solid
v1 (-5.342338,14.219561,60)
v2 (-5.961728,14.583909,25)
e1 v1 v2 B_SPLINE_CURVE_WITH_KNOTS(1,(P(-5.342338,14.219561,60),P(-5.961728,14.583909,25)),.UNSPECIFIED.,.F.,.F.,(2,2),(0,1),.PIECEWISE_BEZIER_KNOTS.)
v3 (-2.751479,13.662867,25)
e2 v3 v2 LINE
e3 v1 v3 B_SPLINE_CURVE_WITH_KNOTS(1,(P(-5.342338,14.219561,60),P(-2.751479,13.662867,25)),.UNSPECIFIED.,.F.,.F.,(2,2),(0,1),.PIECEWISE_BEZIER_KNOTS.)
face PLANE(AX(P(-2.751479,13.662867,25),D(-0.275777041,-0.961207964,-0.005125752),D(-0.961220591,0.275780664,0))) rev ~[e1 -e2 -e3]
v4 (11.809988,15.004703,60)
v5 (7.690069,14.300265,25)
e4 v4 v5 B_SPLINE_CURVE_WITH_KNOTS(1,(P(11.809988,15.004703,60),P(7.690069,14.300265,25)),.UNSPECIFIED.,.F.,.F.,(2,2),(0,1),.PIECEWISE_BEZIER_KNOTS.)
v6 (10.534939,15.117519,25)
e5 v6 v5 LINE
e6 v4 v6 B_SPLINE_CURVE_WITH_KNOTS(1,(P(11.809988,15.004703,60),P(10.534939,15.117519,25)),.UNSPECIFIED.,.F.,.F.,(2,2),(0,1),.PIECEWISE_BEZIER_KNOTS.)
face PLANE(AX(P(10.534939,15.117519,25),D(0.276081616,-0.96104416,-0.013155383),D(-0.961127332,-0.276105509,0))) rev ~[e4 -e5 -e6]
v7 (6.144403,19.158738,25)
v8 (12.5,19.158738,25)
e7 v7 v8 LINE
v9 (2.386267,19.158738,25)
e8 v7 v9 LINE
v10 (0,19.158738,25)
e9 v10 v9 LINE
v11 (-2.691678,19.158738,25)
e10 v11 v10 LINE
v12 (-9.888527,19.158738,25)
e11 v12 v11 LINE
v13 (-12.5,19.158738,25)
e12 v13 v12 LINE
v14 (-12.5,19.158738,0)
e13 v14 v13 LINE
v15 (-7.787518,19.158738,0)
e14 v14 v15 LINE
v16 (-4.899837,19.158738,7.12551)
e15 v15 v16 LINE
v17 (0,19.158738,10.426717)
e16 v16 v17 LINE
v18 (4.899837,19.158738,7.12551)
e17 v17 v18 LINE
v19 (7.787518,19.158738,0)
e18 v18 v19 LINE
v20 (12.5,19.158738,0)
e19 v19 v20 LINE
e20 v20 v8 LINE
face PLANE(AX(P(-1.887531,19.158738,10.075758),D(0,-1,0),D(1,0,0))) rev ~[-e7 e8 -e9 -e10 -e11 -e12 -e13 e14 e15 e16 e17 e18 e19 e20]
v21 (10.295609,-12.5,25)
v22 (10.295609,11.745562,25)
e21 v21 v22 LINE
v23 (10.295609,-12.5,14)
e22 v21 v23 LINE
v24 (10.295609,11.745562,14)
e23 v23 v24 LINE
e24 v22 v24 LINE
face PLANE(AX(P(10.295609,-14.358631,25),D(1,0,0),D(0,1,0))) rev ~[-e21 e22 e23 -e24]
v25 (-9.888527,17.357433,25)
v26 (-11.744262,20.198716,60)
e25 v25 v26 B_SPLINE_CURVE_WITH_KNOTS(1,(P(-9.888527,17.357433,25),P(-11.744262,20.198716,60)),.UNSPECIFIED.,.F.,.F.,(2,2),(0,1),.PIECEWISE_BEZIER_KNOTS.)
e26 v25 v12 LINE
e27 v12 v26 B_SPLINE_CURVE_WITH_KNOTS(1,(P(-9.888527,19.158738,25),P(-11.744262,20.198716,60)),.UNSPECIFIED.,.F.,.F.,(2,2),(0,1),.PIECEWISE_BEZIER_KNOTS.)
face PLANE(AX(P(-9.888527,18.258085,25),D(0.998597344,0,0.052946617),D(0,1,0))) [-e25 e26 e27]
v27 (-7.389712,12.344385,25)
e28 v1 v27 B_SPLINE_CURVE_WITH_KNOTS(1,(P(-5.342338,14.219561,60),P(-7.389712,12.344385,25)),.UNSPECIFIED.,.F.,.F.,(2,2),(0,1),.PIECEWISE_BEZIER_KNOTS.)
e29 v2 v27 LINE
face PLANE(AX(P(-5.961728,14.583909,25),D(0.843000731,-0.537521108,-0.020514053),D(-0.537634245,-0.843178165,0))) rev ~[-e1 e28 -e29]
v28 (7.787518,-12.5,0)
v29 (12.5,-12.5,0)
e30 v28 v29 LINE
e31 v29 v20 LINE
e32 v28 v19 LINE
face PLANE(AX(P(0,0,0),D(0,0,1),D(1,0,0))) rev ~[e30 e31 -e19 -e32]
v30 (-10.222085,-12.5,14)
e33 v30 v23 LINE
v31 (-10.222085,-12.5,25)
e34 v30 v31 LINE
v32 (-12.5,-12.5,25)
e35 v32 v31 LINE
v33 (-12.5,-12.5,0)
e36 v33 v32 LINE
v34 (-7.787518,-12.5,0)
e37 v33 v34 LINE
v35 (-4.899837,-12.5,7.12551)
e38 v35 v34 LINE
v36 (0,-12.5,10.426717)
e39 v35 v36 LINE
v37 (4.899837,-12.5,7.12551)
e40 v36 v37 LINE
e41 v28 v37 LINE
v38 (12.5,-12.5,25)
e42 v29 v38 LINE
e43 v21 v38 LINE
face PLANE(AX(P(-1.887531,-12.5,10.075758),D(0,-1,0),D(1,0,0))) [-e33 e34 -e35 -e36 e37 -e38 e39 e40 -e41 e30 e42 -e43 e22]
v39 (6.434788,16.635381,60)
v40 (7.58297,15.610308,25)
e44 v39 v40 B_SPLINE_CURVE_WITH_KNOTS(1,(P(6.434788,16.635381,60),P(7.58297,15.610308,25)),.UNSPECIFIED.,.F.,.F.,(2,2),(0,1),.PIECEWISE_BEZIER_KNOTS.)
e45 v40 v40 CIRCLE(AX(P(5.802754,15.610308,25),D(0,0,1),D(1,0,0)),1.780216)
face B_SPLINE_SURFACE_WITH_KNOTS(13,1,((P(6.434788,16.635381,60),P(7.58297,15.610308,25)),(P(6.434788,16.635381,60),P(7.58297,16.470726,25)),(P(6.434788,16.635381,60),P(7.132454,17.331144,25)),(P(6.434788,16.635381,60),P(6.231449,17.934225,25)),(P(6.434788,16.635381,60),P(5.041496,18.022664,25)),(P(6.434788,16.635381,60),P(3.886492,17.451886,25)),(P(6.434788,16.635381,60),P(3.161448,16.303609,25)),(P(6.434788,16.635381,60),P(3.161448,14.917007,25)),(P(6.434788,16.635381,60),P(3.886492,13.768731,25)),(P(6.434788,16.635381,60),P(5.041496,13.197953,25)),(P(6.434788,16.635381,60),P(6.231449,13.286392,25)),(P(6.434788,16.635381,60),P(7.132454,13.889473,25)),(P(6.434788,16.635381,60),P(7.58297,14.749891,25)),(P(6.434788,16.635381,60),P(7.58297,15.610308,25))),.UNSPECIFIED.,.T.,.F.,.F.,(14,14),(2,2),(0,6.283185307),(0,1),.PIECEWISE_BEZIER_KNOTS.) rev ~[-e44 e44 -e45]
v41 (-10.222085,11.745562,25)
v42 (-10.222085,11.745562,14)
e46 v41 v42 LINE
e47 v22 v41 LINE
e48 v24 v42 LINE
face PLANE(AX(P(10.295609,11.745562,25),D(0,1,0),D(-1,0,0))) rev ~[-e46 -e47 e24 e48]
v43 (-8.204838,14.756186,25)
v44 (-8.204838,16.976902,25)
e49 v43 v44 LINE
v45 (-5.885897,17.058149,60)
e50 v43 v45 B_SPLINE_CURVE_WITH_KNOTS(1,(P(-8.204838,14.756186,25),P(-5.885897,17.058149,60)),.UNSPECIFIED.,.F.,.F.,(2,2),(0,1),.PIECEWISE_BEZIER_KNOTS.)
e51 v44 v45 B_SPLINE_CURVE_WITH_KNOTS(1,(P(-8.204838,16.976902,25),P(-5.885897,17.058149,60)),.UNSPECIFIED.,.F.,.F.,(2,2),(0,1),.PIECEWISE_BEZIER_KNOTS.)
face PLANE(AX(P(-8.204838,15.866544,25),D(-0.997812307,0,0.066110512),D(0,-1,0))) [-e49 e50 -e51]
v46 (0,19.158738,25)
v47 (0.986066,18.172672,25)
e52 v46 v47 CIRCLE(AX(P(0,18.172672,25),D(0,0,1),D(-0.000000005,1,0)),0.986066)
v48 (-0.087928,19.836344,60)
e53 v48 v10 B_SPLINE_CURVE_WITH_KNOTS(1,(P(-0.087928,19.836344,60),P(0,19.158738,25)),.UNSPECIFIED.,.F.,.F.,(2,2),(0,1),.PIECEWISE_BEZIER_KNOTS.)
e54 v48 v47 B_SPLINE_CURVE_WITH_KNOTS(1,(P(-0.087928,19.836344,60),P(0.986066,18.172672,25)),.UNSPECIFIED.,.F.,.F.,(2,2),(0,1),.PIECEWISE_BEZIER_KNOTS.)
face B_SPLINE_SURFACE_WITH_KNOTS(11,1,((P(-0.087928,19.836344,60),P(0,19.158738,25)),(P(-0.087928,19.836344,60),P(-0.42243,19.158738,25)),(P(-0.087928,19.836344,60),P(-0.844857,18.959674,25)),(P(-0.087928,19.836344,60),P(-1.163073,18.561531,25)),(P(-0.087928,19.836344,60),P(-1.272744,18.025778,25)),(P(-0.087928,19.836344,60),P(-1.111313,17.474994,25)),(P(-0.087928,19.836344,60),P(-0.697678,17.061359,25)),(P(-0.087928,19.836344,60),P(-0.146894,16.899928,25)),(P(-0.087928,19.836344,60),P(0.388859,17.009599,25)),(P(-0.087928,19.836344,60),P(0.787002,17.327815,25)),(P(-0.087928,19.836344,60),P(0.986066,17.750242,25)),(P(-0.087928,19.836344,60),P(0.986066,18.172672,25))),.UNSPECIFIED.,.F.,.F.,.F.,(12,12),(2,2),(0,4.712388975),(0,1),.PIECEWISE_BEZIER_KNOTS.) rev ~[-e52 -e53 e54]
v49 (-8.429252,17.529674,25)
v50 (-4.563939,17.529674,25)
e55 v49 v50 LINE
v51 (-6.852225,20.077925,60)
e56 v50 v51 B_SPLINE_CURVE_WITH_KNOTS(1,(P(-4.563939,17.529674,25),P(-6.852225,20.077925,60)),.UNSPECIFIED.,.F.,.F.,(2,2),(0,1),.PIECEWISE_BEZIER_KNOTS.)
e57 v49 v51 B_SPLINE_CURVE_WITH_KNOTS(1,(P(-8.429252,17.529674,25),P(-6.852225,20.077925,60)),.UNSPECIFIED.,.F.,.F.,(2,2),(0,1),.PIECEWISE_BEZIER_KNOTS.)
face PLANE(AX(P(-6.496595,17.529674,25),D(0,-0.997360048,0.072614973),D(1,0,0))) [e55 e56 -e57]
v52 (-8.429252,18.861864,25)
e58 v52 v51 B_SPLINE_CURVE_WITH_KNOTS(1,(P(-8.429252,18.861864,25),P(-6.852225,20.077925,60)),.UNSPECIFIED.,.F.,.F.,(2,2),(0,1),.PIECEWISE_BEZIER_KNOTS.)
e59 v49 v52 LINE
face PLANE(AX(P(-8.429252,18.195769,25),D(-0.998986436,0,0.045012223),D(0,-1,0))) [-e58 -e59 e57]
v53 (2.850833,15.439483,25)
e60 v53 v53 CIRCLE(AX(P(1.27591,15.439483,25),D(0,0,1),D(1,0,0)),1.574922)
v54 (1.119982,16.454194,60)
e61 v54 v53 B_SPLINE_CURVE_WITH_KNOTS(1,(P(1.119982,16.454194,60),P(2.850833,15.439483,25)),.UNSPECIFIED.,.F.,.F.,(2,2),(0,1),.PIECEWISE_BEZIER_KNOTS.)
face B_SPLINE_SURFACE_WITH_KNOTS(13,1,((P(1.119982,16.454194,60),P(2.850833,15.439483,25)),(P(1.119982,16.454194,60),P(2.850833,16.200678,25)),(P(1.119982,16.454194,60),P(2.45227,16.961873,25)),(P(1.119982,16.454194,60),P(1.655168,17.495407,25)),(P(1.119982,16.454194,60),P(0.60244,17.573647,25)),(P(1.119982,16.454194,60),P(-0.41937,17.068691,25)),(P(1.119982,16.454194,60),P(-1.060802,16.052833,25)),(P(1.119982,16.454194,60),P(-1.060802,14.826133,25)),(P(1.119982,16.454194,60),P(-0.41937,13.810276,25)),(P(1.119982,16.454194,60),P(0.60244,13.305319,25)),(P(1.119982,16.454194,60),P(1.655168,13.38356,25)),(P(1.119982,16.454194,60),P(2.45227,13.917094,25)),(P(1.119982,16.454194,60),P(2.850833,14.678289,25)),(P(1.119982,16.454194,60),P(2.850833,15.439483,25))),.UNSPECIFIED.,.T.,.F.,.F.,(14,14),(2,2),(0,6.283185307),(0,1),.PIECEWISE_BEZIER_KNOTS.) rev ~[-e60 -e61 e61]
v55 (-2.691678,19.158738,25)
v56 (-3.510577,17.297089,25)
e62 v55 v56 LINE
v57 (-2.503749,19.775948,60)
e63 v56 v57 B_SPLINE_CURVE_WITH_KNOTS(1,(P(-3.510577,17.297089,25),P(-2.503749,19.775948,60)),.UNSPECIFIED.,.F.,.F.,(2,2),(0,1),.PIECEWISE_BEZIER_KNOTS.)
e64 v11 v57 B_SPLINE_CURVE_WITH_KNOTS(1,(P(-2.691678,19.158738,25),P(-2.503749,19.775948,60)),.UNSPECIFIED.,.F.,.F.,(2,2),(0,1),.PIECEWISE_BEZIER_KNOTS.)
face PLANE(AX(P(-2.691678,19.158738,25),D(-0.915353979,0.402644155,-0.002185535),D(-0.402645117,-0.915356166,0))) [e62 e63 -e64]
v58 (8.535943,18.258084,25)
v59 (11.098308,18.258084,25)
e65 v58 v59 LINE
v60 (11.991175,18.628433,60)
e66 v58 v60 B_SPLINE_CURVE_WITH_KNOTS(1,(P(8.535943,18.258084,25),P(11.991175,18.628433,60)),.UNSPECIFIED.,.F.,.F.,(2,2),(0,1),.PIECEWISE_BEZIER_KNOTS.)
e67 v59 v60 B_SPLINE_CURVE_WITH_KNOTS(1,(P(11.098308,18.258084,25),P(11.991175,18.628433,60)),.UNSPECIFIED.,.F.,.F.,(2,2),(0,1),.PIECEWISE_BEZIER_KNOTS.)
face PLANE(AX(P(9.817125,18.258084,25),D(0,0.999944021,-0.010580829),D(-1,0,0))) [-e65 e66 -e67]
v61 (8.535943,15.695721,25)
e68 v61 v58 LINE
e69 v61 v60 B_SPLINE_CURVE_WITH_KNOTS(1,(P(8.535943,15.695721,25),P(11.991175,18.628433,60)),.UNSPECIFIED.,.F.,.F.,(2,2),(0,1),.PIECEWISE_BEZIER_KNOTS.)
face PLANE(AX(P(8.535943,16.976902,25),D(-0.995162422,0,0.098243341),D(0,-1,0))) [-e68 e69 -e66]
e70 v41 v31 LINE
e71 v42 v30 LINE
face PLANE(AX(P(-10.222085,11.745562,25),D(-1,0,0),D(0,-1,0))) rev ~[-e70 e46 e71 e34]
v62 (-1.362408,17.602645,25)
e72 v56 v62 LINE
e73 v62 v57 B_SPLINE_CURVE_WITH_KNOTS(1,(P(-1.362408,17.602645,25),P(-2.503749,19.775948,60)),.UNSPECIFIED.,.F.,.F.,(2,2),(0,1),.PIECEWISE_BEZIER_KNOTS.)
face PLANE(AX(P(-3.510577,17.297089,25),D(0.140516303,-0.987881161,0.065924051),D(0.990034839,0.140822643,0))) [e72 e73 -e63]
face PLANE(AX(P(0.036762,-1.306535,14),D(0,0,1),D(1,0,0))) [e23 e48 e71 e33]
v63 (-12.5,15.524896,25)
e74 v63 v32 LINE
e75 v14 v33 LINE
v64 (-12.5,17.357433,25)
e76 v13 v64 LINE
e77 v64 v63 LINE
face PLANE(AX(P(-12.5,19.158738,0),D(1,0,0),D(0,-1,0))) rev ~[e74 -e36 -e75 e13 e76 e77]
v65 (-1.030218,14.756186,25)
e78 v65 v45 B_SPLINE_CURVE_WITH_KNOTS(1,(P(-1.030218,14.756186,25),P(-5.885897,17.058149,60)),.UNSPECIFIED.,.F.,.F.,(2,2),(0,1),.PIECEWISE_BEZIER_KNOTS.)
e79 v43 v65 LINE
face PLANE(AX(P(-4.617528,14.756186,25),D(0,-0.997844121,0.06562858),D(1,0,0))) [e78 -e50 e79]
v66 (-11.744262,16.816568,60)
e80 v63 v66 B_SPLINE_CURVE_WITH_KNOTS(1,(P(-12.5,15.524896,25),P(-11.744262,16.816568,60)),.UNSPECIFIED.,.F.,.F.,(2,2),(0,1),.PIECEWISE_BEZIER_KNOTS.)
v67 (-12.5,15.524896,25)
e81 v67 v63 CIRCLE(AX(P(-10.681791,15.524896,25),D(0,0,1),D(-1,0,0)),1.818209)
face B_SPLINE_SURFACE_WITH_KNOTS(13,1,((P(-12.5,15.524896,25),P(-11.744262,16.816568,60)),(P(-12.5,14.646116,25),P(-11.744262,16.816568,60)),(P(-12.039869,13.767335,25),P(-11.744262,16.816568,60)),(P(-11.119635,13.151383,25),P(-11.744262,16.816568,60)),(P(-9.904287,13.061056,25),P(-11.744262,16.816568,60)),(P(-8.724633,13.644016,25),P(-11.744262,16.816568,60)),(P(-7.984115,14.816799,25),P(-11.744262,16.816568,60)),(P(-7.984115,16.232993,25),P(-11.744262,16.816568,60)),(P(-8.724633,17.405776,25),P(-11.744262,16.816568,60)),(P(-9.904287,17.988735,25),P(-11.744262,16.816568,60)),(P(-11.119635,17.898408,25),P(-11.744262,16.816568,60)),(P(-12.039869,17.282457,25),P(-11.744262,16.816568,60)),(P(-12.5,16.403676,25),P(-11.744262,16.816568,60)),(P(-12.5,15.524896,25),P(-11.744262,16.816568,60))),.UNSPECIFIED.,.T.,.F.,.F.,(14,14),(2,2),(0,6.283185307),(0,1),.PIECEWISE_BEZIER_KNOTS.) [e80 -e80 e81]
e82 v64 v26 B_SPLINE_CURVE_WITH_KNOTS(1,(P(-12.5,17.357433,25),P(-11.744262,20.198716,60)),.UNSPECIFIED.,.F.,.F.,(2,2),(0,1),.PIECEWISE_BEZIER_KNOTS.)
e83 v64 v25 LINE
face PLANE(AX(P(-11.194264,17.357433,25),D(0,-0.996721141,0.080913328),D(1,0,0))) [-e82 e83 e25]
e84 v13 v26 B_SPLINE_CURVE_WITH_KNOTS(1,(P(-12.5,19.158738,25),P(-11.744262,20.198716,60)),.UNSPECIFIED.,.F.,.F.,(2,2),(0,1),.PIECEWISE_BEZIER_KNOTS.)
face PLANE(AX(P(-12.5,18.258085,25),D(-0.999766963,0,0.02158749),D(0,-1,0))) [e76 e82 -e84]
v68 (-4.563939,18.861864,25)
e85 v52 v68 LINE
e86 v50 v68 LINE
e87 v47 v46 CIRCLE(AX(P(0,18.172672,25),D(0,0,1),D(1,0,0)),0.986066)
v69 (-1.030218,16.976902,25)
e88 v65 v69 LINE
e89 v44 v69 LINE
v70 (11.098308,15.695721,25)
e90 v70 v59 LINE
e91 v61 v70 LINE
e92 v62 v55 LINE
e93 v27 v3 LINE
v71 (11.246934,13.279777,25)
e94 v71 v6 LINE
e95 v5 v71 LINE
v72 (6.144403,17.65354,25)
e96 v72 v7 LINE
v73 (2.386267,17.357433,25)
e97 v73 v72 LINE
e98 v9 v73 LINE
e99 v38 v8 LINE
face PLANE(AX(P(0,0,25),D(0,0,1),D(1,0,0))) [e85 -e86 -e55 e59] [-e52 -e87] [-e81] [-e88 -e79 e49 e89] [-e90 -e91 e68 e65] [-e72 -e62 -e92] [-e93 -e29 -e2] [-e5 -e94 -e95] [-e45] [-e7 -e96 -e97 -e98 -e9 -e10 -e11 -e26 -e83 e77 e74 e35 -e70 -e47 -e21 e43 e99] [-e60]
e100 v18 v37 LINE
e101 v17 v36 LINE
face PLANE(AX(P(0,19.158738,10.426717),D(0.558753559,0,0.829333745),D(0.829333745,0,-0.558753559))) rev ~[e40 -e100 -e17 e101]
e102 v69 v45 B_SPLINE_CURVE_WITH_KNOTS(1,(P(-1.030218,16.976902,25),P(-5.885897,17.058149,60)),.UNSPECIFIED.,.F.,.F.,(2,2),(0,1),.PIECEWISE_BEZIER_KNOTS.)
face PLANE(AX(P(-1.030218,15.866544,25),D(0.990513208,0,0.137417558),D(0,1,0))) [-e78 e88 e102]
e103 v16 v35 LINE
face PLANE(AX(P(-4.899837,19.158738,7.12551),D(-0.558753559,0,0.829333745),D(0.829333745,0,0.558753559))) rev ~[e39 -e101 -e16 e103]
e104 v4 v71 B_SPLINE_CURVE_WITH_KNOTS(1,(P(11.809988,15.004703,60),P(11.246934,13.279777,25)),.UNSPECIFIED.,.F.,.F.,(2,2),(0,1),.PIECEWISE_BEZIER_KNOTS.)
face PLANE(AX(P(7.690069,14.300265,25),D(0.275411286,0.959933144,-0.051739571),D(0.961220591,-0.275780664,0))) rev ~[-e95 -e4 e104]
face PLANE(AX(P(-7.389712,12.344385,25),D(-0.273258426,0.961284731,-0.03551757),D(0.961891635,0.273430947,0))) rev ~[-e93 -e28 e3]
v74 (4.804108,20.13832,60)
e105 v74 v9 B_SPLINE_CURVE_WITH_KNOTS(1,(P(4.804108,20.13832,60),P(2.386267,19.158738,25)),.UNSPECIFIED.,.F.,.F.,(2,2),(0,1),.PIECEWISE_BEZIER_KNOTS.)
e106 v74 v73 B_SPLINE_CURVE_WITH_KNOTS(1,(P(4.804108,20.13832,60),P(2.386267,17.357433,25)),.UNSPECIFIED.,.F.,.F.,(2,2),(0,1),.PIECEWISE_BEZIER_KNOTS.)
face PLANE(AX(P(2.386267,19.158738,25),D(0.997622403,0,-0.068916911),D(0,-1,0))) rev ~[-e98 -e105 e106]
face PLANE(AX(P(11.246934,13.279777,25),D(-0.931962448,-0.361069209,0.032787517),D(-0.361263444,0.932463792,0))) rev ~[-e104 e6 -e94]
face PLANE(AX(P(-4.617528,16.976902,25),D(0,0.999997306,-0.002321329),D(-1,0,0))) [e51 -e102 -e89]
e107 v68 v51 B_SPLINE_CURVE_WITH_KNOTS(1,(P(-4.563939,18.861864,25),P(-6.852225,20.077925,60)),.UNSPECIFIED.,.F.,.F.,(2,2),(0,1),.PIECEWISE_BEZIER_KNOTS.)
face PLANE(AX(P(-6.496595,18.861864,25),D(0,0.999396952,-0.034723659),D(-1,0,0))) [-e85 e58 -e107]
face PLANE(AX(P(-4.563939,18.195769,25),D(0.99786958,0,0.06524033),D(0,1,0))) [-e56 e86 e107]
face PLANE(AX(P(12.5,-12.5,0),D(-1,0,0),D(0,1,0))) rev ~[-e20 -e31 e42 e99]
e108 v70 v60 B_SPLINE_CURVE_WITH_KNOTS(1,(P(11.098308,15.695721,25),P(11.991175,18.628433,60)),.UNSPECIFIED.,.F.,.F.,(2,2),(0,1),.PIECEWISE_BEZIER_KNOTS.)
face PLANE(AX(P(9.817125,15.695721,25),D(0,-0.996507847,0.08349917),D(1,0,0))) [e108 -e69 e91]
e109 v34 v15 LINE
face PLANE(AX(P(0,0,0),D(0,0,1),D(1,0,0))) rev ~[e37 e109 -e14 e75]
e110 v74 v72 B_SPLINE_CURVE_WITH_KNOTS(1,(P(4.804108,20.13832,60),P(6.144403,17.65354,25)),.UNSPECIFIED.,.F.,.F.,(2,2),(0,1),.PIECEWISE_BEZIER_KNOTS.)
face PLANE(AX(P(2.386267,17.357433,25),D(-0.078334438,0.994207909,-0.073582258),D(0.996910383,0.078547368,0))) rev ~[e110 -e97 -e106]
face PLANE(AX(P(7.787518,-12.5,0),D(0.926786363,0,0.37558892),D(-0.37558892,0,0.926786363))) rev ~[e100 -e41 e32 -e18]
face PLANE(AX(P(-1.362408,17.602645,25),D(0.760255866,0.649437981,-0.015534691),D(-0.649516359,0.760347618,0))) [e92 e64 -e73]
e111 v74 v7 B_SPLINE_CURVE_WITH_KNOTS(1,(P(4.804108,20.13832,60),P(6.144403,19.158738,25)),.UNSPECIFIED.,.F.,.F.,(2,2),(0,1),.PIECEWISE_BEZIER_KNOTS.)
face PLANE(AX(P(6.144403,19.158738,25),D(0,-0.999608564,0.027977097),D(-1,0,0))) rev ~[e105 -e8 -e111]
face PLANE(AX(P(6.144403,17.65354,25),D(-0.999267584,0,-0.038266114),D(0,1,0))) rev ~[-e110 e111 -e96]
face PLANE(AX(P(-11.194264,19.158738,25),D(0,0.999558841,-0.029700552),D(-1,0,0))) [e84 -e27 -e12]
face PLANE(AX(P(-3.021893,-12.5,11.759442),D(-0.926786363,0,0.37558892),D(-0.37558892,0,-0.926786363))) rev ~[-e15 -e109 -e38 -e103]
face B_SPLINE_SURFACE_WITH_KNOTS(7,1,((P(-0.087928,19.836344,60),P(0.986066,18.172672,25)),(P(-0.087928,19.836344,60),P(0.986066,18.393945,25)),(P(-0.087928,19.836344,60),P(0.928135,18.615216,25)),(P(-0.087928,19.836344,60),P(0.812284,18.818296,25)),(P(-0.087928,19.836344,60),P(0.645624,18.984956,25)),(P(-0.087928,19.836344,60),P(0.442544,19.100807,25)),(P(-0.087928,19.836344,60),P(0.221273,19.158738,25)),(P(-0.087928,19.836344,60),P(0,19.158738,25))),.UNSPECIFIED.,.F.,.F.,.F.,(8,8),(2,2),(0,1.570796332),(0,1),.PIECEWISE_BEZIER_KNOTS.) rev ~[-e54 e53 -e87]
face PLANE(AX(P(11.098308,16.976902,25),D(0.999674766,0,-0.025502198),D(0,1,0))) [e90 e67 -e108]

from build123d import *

# Parameters (mm, degrees)
F0_W         = 25
F0_H         = 25
F0_H_2       = 6.658737734
F1_DEPTH     = 25
F3_DEPTH     = 35.6
F4_W         = 2.6114728302
F4_H         = 1.8013045192
F4_W_2       = 7.1746204048
F4_H_2       = 2.2207163274
F4_W_3       = 3.8653127849
F4_H_3       = 1.3321898878
F4_R         = 1.5749223429
F4_R_2       = 1.7802160879
F4_W_4       = 2.5623645633
F4_H_4       = 2.5623627007
F20_DEPTH    = 11
F21_T1_DEPTH = 31.658737734


# Not quite as in the source:
# - a fillet or chamfer that OpenCascade refuses, or shapes differently, is made with other operations: its cross-section is extruded or revolved along the edge and cut away or added


with BuildPart() as f1:
    # F0 (on Top) → F1 (new body)
    with BuildSketch(Plane.XY):
        Rectangle(F0_W, F0_H)
        with Locations((0, 15.829368867)):
            Rectangle(F0_W, F0_H_2)
    extrude(amount=F1_DEPTH)

    # F2 (on face) → F3 (cut)
    with BuildSketch(Plane.XZ.offset(12.5)):
        Polygon((0, 11.7594422773), (0, 0), (7.7875177376, 0), (3.0218927836, 11.7594422773), align=None)
        Polygon((-3.0218927836, 11.7594422773), (-7.7875177376, 0), (0, 0), (0, 11.7594422773), align=None)
    extrude(amount=-F3_DEPTH, mode=Mode.SUBTRACT)

    # F4 (on face) → F7 section 0
    with BuildSketch(Plane.XY.offset(25), mode=Mode.PRIVATE) as f7_s0:
        with BuildLine():
            ThreePointArc((-8.8635824621, 15.5248958617), (-10.681791231, 17.3431046307), (-12.5, 15.5248958617))
            ThreePointArc((-12.5, 15.5248958617), (-10.681791231, 13.7066870928), (-8.8635824621, 15.5248958617))
        make_face()
    loft([f7_s0.sketch, Vertex(-11.7442617193, 16.8165676296, 60)])

    # F4 (on face) → F8 section 0
    with BuildSketch(Plane.XY.offset(25), mode=Mode.PRIVATE) as f8_s0:
        with Locations((-11.1942635849, 18.2580854744)):
            Rectangle(F4_W, F4_H)
    loft([f8_s0.sketch, Vertex(-11.7442617193, 20.1987158507, 60)])

    # F4 (on face) → F9 section 0
    with BuildSketch(Plane.XY.offset(25), mode=Mode.PRIVATE) as f9_s0:
        Polygon((11.2469336018, 13.2797770202), (10.5349393561, 15.1175186038), (7.6900690421, 14.3002654268), align=None)
    loft([Vertex(11.8099879473, 15.0047028437, 60), f9_s0.sketch])

    # F4 (on face) → F10 section 0
    with BuildSketch(Plane.XY.offset(25), mode=Mode.PRIVATE) as f10_s0:
        with Locations((-4.6175280586, 15.8665440977)):
            Rectangle(F4_W_2, F4_H_2)
    loft([f10_s0.sketch, Vertex(-5.8858972043, 17.0581489801, 60)])

    # F4 (on face) → F11 section 0
    with BuildSketch(Plane.XY.offset(25), mode=Mode.PRIVATE) as f11_s0:
        Polygon((-5.9617283097, 14.5839094924), (-7.3897121474, 12.3443854973), (-2.7514786925, 13.6628672481), align=None)
    loft([Vertex(-5.3423377685, 14.2195606604, 60), f11_s0.sketch])

    # F4 (on face) → F12 section 0
    with BuildSketch(Plane.XY.offset(25), mode=Mode.PRIVATE) as f12_s0:
        with Locations((-6.4965952188, 18.1957688183)):
            Rectangle(F4_W_3, F4_H_3)
    loft([f12_s0.sketch, Vertex(-6.8522254005, 20.0779251754, 60)])

    # F4 (on face) → F13 section 0
    with BuildSketch(Plane.XY.offset(25), mode=Mode.PRIVATE) as f13_s0:
        Polygon((-1.36240758, 17.6026448607), (-2.6916782372, 19.158737734), (-3.5105766729, 17.2970890999), align=None)
    loft([f13_s0.sketch, Vertex(-2.5037485175, 19.7759475559, 60)])

    # F4 (on face) → F14 section 0
    with BuildSketch(Plane.XY.offset(25), mode=Mode.PRIVATE) as f14_s0:
        with Locations((1.2759102974, 15.4394833371)):
            Circle(F4_R)
    loft([Vertex(1.1199823348, 16.4541937411, 60), f14_s0.sketch])

    # F4 (on face) → F15 section 0
    with BuildSketch(Plane.XY.offset(25), mode=Mode.PRIVATE) as f15_s0:
        with BuildLine():
            ThreePointArc((0.9860657156, 18.1726720184), (0.6972537523, 18.8699257744), (-5.2e-09, 19.158737734))
            ThreePointArc((-5.2e-09, 19.158737734), (-0.6972537523, 17.4754182624), (0.9860657156, 18.1726720184))
        make_face()
    loft([Vertex(-0.0879280269, 19.8363438249, 60), f15_s0.sketch])

    # F4 (on face) → F16 section 0
    with BuildSketch(Plane.XY.offset(25), mode=Mode.PRIVATE) as f16_s0:
        Polygon((6.14440348, 19.158737734), (2.386267297, 19.158737734), (2.386267297, 17.3574332148), (6.14440348, 17.6535397768), align=None)
    loft([Vertex(4.8041078262, 20.1383195817, 60), f16_s0.sketch])

    # F4 (on face) → F17 section 0
    with BuildSketch(Plane.XY.offset(25), mode=Mode.PRIVATE) as f17_s0:
        with Locations((5.8027543128, 15.6103083864)):
            Circle(F4_R_2)
    loft([Vertex(6.4347875305, 16.6353806853, 60), f17_s0.sketch])

    # F4 (on face) → F18 section 0
    with BuildSketch(Plane.XY.offset(25), mode=Mode.PRIVATE) as f18_s0:
        with Locations((9.8171252757, 16.9769022614)):
            Rectangle(F4_W_4, F4_H_4)
    loft([f18_s0.sketch, Vertex(11.9911748916, 18.6284333467, 60)])

    # F19 (on face) → F20 (cut)
    with BuildSketch(Plane.XY.offset(25)):
        Polygon((10.2956090122, -14.3586313352), (10.2956090122, -12.4287493527), (10.2956090122, 11.7455618456), (-10.2220848203, 11.7455618456), (-10.2220848203, -12.3271765187), (-10.2220848203, -14.3586313352), align=None)
    extrude(amount=-F20_DEPTH, mode=Mode.SUBTRACT)

    # F21: chamfer of 5 on 2 edges, made by hand

    # F21_s2 → F21_t1 (join)
    with BuildSketch(Plane.XZ.offset(-19.158737734)):
        Polygon((-4.8998373819, 7.1255104601), (1.9781072164, 11.7594422773), (-3.0218927836, 11.7594422773), align=None)
        Polygon((-1.9781072164, 11.7594422773), (4.8998373819, 7.1255104601), (3.0218927836, 11.7594422773), align=None)
    extrude(amount=F21_T1_DEPTH)


solid = f1.part
